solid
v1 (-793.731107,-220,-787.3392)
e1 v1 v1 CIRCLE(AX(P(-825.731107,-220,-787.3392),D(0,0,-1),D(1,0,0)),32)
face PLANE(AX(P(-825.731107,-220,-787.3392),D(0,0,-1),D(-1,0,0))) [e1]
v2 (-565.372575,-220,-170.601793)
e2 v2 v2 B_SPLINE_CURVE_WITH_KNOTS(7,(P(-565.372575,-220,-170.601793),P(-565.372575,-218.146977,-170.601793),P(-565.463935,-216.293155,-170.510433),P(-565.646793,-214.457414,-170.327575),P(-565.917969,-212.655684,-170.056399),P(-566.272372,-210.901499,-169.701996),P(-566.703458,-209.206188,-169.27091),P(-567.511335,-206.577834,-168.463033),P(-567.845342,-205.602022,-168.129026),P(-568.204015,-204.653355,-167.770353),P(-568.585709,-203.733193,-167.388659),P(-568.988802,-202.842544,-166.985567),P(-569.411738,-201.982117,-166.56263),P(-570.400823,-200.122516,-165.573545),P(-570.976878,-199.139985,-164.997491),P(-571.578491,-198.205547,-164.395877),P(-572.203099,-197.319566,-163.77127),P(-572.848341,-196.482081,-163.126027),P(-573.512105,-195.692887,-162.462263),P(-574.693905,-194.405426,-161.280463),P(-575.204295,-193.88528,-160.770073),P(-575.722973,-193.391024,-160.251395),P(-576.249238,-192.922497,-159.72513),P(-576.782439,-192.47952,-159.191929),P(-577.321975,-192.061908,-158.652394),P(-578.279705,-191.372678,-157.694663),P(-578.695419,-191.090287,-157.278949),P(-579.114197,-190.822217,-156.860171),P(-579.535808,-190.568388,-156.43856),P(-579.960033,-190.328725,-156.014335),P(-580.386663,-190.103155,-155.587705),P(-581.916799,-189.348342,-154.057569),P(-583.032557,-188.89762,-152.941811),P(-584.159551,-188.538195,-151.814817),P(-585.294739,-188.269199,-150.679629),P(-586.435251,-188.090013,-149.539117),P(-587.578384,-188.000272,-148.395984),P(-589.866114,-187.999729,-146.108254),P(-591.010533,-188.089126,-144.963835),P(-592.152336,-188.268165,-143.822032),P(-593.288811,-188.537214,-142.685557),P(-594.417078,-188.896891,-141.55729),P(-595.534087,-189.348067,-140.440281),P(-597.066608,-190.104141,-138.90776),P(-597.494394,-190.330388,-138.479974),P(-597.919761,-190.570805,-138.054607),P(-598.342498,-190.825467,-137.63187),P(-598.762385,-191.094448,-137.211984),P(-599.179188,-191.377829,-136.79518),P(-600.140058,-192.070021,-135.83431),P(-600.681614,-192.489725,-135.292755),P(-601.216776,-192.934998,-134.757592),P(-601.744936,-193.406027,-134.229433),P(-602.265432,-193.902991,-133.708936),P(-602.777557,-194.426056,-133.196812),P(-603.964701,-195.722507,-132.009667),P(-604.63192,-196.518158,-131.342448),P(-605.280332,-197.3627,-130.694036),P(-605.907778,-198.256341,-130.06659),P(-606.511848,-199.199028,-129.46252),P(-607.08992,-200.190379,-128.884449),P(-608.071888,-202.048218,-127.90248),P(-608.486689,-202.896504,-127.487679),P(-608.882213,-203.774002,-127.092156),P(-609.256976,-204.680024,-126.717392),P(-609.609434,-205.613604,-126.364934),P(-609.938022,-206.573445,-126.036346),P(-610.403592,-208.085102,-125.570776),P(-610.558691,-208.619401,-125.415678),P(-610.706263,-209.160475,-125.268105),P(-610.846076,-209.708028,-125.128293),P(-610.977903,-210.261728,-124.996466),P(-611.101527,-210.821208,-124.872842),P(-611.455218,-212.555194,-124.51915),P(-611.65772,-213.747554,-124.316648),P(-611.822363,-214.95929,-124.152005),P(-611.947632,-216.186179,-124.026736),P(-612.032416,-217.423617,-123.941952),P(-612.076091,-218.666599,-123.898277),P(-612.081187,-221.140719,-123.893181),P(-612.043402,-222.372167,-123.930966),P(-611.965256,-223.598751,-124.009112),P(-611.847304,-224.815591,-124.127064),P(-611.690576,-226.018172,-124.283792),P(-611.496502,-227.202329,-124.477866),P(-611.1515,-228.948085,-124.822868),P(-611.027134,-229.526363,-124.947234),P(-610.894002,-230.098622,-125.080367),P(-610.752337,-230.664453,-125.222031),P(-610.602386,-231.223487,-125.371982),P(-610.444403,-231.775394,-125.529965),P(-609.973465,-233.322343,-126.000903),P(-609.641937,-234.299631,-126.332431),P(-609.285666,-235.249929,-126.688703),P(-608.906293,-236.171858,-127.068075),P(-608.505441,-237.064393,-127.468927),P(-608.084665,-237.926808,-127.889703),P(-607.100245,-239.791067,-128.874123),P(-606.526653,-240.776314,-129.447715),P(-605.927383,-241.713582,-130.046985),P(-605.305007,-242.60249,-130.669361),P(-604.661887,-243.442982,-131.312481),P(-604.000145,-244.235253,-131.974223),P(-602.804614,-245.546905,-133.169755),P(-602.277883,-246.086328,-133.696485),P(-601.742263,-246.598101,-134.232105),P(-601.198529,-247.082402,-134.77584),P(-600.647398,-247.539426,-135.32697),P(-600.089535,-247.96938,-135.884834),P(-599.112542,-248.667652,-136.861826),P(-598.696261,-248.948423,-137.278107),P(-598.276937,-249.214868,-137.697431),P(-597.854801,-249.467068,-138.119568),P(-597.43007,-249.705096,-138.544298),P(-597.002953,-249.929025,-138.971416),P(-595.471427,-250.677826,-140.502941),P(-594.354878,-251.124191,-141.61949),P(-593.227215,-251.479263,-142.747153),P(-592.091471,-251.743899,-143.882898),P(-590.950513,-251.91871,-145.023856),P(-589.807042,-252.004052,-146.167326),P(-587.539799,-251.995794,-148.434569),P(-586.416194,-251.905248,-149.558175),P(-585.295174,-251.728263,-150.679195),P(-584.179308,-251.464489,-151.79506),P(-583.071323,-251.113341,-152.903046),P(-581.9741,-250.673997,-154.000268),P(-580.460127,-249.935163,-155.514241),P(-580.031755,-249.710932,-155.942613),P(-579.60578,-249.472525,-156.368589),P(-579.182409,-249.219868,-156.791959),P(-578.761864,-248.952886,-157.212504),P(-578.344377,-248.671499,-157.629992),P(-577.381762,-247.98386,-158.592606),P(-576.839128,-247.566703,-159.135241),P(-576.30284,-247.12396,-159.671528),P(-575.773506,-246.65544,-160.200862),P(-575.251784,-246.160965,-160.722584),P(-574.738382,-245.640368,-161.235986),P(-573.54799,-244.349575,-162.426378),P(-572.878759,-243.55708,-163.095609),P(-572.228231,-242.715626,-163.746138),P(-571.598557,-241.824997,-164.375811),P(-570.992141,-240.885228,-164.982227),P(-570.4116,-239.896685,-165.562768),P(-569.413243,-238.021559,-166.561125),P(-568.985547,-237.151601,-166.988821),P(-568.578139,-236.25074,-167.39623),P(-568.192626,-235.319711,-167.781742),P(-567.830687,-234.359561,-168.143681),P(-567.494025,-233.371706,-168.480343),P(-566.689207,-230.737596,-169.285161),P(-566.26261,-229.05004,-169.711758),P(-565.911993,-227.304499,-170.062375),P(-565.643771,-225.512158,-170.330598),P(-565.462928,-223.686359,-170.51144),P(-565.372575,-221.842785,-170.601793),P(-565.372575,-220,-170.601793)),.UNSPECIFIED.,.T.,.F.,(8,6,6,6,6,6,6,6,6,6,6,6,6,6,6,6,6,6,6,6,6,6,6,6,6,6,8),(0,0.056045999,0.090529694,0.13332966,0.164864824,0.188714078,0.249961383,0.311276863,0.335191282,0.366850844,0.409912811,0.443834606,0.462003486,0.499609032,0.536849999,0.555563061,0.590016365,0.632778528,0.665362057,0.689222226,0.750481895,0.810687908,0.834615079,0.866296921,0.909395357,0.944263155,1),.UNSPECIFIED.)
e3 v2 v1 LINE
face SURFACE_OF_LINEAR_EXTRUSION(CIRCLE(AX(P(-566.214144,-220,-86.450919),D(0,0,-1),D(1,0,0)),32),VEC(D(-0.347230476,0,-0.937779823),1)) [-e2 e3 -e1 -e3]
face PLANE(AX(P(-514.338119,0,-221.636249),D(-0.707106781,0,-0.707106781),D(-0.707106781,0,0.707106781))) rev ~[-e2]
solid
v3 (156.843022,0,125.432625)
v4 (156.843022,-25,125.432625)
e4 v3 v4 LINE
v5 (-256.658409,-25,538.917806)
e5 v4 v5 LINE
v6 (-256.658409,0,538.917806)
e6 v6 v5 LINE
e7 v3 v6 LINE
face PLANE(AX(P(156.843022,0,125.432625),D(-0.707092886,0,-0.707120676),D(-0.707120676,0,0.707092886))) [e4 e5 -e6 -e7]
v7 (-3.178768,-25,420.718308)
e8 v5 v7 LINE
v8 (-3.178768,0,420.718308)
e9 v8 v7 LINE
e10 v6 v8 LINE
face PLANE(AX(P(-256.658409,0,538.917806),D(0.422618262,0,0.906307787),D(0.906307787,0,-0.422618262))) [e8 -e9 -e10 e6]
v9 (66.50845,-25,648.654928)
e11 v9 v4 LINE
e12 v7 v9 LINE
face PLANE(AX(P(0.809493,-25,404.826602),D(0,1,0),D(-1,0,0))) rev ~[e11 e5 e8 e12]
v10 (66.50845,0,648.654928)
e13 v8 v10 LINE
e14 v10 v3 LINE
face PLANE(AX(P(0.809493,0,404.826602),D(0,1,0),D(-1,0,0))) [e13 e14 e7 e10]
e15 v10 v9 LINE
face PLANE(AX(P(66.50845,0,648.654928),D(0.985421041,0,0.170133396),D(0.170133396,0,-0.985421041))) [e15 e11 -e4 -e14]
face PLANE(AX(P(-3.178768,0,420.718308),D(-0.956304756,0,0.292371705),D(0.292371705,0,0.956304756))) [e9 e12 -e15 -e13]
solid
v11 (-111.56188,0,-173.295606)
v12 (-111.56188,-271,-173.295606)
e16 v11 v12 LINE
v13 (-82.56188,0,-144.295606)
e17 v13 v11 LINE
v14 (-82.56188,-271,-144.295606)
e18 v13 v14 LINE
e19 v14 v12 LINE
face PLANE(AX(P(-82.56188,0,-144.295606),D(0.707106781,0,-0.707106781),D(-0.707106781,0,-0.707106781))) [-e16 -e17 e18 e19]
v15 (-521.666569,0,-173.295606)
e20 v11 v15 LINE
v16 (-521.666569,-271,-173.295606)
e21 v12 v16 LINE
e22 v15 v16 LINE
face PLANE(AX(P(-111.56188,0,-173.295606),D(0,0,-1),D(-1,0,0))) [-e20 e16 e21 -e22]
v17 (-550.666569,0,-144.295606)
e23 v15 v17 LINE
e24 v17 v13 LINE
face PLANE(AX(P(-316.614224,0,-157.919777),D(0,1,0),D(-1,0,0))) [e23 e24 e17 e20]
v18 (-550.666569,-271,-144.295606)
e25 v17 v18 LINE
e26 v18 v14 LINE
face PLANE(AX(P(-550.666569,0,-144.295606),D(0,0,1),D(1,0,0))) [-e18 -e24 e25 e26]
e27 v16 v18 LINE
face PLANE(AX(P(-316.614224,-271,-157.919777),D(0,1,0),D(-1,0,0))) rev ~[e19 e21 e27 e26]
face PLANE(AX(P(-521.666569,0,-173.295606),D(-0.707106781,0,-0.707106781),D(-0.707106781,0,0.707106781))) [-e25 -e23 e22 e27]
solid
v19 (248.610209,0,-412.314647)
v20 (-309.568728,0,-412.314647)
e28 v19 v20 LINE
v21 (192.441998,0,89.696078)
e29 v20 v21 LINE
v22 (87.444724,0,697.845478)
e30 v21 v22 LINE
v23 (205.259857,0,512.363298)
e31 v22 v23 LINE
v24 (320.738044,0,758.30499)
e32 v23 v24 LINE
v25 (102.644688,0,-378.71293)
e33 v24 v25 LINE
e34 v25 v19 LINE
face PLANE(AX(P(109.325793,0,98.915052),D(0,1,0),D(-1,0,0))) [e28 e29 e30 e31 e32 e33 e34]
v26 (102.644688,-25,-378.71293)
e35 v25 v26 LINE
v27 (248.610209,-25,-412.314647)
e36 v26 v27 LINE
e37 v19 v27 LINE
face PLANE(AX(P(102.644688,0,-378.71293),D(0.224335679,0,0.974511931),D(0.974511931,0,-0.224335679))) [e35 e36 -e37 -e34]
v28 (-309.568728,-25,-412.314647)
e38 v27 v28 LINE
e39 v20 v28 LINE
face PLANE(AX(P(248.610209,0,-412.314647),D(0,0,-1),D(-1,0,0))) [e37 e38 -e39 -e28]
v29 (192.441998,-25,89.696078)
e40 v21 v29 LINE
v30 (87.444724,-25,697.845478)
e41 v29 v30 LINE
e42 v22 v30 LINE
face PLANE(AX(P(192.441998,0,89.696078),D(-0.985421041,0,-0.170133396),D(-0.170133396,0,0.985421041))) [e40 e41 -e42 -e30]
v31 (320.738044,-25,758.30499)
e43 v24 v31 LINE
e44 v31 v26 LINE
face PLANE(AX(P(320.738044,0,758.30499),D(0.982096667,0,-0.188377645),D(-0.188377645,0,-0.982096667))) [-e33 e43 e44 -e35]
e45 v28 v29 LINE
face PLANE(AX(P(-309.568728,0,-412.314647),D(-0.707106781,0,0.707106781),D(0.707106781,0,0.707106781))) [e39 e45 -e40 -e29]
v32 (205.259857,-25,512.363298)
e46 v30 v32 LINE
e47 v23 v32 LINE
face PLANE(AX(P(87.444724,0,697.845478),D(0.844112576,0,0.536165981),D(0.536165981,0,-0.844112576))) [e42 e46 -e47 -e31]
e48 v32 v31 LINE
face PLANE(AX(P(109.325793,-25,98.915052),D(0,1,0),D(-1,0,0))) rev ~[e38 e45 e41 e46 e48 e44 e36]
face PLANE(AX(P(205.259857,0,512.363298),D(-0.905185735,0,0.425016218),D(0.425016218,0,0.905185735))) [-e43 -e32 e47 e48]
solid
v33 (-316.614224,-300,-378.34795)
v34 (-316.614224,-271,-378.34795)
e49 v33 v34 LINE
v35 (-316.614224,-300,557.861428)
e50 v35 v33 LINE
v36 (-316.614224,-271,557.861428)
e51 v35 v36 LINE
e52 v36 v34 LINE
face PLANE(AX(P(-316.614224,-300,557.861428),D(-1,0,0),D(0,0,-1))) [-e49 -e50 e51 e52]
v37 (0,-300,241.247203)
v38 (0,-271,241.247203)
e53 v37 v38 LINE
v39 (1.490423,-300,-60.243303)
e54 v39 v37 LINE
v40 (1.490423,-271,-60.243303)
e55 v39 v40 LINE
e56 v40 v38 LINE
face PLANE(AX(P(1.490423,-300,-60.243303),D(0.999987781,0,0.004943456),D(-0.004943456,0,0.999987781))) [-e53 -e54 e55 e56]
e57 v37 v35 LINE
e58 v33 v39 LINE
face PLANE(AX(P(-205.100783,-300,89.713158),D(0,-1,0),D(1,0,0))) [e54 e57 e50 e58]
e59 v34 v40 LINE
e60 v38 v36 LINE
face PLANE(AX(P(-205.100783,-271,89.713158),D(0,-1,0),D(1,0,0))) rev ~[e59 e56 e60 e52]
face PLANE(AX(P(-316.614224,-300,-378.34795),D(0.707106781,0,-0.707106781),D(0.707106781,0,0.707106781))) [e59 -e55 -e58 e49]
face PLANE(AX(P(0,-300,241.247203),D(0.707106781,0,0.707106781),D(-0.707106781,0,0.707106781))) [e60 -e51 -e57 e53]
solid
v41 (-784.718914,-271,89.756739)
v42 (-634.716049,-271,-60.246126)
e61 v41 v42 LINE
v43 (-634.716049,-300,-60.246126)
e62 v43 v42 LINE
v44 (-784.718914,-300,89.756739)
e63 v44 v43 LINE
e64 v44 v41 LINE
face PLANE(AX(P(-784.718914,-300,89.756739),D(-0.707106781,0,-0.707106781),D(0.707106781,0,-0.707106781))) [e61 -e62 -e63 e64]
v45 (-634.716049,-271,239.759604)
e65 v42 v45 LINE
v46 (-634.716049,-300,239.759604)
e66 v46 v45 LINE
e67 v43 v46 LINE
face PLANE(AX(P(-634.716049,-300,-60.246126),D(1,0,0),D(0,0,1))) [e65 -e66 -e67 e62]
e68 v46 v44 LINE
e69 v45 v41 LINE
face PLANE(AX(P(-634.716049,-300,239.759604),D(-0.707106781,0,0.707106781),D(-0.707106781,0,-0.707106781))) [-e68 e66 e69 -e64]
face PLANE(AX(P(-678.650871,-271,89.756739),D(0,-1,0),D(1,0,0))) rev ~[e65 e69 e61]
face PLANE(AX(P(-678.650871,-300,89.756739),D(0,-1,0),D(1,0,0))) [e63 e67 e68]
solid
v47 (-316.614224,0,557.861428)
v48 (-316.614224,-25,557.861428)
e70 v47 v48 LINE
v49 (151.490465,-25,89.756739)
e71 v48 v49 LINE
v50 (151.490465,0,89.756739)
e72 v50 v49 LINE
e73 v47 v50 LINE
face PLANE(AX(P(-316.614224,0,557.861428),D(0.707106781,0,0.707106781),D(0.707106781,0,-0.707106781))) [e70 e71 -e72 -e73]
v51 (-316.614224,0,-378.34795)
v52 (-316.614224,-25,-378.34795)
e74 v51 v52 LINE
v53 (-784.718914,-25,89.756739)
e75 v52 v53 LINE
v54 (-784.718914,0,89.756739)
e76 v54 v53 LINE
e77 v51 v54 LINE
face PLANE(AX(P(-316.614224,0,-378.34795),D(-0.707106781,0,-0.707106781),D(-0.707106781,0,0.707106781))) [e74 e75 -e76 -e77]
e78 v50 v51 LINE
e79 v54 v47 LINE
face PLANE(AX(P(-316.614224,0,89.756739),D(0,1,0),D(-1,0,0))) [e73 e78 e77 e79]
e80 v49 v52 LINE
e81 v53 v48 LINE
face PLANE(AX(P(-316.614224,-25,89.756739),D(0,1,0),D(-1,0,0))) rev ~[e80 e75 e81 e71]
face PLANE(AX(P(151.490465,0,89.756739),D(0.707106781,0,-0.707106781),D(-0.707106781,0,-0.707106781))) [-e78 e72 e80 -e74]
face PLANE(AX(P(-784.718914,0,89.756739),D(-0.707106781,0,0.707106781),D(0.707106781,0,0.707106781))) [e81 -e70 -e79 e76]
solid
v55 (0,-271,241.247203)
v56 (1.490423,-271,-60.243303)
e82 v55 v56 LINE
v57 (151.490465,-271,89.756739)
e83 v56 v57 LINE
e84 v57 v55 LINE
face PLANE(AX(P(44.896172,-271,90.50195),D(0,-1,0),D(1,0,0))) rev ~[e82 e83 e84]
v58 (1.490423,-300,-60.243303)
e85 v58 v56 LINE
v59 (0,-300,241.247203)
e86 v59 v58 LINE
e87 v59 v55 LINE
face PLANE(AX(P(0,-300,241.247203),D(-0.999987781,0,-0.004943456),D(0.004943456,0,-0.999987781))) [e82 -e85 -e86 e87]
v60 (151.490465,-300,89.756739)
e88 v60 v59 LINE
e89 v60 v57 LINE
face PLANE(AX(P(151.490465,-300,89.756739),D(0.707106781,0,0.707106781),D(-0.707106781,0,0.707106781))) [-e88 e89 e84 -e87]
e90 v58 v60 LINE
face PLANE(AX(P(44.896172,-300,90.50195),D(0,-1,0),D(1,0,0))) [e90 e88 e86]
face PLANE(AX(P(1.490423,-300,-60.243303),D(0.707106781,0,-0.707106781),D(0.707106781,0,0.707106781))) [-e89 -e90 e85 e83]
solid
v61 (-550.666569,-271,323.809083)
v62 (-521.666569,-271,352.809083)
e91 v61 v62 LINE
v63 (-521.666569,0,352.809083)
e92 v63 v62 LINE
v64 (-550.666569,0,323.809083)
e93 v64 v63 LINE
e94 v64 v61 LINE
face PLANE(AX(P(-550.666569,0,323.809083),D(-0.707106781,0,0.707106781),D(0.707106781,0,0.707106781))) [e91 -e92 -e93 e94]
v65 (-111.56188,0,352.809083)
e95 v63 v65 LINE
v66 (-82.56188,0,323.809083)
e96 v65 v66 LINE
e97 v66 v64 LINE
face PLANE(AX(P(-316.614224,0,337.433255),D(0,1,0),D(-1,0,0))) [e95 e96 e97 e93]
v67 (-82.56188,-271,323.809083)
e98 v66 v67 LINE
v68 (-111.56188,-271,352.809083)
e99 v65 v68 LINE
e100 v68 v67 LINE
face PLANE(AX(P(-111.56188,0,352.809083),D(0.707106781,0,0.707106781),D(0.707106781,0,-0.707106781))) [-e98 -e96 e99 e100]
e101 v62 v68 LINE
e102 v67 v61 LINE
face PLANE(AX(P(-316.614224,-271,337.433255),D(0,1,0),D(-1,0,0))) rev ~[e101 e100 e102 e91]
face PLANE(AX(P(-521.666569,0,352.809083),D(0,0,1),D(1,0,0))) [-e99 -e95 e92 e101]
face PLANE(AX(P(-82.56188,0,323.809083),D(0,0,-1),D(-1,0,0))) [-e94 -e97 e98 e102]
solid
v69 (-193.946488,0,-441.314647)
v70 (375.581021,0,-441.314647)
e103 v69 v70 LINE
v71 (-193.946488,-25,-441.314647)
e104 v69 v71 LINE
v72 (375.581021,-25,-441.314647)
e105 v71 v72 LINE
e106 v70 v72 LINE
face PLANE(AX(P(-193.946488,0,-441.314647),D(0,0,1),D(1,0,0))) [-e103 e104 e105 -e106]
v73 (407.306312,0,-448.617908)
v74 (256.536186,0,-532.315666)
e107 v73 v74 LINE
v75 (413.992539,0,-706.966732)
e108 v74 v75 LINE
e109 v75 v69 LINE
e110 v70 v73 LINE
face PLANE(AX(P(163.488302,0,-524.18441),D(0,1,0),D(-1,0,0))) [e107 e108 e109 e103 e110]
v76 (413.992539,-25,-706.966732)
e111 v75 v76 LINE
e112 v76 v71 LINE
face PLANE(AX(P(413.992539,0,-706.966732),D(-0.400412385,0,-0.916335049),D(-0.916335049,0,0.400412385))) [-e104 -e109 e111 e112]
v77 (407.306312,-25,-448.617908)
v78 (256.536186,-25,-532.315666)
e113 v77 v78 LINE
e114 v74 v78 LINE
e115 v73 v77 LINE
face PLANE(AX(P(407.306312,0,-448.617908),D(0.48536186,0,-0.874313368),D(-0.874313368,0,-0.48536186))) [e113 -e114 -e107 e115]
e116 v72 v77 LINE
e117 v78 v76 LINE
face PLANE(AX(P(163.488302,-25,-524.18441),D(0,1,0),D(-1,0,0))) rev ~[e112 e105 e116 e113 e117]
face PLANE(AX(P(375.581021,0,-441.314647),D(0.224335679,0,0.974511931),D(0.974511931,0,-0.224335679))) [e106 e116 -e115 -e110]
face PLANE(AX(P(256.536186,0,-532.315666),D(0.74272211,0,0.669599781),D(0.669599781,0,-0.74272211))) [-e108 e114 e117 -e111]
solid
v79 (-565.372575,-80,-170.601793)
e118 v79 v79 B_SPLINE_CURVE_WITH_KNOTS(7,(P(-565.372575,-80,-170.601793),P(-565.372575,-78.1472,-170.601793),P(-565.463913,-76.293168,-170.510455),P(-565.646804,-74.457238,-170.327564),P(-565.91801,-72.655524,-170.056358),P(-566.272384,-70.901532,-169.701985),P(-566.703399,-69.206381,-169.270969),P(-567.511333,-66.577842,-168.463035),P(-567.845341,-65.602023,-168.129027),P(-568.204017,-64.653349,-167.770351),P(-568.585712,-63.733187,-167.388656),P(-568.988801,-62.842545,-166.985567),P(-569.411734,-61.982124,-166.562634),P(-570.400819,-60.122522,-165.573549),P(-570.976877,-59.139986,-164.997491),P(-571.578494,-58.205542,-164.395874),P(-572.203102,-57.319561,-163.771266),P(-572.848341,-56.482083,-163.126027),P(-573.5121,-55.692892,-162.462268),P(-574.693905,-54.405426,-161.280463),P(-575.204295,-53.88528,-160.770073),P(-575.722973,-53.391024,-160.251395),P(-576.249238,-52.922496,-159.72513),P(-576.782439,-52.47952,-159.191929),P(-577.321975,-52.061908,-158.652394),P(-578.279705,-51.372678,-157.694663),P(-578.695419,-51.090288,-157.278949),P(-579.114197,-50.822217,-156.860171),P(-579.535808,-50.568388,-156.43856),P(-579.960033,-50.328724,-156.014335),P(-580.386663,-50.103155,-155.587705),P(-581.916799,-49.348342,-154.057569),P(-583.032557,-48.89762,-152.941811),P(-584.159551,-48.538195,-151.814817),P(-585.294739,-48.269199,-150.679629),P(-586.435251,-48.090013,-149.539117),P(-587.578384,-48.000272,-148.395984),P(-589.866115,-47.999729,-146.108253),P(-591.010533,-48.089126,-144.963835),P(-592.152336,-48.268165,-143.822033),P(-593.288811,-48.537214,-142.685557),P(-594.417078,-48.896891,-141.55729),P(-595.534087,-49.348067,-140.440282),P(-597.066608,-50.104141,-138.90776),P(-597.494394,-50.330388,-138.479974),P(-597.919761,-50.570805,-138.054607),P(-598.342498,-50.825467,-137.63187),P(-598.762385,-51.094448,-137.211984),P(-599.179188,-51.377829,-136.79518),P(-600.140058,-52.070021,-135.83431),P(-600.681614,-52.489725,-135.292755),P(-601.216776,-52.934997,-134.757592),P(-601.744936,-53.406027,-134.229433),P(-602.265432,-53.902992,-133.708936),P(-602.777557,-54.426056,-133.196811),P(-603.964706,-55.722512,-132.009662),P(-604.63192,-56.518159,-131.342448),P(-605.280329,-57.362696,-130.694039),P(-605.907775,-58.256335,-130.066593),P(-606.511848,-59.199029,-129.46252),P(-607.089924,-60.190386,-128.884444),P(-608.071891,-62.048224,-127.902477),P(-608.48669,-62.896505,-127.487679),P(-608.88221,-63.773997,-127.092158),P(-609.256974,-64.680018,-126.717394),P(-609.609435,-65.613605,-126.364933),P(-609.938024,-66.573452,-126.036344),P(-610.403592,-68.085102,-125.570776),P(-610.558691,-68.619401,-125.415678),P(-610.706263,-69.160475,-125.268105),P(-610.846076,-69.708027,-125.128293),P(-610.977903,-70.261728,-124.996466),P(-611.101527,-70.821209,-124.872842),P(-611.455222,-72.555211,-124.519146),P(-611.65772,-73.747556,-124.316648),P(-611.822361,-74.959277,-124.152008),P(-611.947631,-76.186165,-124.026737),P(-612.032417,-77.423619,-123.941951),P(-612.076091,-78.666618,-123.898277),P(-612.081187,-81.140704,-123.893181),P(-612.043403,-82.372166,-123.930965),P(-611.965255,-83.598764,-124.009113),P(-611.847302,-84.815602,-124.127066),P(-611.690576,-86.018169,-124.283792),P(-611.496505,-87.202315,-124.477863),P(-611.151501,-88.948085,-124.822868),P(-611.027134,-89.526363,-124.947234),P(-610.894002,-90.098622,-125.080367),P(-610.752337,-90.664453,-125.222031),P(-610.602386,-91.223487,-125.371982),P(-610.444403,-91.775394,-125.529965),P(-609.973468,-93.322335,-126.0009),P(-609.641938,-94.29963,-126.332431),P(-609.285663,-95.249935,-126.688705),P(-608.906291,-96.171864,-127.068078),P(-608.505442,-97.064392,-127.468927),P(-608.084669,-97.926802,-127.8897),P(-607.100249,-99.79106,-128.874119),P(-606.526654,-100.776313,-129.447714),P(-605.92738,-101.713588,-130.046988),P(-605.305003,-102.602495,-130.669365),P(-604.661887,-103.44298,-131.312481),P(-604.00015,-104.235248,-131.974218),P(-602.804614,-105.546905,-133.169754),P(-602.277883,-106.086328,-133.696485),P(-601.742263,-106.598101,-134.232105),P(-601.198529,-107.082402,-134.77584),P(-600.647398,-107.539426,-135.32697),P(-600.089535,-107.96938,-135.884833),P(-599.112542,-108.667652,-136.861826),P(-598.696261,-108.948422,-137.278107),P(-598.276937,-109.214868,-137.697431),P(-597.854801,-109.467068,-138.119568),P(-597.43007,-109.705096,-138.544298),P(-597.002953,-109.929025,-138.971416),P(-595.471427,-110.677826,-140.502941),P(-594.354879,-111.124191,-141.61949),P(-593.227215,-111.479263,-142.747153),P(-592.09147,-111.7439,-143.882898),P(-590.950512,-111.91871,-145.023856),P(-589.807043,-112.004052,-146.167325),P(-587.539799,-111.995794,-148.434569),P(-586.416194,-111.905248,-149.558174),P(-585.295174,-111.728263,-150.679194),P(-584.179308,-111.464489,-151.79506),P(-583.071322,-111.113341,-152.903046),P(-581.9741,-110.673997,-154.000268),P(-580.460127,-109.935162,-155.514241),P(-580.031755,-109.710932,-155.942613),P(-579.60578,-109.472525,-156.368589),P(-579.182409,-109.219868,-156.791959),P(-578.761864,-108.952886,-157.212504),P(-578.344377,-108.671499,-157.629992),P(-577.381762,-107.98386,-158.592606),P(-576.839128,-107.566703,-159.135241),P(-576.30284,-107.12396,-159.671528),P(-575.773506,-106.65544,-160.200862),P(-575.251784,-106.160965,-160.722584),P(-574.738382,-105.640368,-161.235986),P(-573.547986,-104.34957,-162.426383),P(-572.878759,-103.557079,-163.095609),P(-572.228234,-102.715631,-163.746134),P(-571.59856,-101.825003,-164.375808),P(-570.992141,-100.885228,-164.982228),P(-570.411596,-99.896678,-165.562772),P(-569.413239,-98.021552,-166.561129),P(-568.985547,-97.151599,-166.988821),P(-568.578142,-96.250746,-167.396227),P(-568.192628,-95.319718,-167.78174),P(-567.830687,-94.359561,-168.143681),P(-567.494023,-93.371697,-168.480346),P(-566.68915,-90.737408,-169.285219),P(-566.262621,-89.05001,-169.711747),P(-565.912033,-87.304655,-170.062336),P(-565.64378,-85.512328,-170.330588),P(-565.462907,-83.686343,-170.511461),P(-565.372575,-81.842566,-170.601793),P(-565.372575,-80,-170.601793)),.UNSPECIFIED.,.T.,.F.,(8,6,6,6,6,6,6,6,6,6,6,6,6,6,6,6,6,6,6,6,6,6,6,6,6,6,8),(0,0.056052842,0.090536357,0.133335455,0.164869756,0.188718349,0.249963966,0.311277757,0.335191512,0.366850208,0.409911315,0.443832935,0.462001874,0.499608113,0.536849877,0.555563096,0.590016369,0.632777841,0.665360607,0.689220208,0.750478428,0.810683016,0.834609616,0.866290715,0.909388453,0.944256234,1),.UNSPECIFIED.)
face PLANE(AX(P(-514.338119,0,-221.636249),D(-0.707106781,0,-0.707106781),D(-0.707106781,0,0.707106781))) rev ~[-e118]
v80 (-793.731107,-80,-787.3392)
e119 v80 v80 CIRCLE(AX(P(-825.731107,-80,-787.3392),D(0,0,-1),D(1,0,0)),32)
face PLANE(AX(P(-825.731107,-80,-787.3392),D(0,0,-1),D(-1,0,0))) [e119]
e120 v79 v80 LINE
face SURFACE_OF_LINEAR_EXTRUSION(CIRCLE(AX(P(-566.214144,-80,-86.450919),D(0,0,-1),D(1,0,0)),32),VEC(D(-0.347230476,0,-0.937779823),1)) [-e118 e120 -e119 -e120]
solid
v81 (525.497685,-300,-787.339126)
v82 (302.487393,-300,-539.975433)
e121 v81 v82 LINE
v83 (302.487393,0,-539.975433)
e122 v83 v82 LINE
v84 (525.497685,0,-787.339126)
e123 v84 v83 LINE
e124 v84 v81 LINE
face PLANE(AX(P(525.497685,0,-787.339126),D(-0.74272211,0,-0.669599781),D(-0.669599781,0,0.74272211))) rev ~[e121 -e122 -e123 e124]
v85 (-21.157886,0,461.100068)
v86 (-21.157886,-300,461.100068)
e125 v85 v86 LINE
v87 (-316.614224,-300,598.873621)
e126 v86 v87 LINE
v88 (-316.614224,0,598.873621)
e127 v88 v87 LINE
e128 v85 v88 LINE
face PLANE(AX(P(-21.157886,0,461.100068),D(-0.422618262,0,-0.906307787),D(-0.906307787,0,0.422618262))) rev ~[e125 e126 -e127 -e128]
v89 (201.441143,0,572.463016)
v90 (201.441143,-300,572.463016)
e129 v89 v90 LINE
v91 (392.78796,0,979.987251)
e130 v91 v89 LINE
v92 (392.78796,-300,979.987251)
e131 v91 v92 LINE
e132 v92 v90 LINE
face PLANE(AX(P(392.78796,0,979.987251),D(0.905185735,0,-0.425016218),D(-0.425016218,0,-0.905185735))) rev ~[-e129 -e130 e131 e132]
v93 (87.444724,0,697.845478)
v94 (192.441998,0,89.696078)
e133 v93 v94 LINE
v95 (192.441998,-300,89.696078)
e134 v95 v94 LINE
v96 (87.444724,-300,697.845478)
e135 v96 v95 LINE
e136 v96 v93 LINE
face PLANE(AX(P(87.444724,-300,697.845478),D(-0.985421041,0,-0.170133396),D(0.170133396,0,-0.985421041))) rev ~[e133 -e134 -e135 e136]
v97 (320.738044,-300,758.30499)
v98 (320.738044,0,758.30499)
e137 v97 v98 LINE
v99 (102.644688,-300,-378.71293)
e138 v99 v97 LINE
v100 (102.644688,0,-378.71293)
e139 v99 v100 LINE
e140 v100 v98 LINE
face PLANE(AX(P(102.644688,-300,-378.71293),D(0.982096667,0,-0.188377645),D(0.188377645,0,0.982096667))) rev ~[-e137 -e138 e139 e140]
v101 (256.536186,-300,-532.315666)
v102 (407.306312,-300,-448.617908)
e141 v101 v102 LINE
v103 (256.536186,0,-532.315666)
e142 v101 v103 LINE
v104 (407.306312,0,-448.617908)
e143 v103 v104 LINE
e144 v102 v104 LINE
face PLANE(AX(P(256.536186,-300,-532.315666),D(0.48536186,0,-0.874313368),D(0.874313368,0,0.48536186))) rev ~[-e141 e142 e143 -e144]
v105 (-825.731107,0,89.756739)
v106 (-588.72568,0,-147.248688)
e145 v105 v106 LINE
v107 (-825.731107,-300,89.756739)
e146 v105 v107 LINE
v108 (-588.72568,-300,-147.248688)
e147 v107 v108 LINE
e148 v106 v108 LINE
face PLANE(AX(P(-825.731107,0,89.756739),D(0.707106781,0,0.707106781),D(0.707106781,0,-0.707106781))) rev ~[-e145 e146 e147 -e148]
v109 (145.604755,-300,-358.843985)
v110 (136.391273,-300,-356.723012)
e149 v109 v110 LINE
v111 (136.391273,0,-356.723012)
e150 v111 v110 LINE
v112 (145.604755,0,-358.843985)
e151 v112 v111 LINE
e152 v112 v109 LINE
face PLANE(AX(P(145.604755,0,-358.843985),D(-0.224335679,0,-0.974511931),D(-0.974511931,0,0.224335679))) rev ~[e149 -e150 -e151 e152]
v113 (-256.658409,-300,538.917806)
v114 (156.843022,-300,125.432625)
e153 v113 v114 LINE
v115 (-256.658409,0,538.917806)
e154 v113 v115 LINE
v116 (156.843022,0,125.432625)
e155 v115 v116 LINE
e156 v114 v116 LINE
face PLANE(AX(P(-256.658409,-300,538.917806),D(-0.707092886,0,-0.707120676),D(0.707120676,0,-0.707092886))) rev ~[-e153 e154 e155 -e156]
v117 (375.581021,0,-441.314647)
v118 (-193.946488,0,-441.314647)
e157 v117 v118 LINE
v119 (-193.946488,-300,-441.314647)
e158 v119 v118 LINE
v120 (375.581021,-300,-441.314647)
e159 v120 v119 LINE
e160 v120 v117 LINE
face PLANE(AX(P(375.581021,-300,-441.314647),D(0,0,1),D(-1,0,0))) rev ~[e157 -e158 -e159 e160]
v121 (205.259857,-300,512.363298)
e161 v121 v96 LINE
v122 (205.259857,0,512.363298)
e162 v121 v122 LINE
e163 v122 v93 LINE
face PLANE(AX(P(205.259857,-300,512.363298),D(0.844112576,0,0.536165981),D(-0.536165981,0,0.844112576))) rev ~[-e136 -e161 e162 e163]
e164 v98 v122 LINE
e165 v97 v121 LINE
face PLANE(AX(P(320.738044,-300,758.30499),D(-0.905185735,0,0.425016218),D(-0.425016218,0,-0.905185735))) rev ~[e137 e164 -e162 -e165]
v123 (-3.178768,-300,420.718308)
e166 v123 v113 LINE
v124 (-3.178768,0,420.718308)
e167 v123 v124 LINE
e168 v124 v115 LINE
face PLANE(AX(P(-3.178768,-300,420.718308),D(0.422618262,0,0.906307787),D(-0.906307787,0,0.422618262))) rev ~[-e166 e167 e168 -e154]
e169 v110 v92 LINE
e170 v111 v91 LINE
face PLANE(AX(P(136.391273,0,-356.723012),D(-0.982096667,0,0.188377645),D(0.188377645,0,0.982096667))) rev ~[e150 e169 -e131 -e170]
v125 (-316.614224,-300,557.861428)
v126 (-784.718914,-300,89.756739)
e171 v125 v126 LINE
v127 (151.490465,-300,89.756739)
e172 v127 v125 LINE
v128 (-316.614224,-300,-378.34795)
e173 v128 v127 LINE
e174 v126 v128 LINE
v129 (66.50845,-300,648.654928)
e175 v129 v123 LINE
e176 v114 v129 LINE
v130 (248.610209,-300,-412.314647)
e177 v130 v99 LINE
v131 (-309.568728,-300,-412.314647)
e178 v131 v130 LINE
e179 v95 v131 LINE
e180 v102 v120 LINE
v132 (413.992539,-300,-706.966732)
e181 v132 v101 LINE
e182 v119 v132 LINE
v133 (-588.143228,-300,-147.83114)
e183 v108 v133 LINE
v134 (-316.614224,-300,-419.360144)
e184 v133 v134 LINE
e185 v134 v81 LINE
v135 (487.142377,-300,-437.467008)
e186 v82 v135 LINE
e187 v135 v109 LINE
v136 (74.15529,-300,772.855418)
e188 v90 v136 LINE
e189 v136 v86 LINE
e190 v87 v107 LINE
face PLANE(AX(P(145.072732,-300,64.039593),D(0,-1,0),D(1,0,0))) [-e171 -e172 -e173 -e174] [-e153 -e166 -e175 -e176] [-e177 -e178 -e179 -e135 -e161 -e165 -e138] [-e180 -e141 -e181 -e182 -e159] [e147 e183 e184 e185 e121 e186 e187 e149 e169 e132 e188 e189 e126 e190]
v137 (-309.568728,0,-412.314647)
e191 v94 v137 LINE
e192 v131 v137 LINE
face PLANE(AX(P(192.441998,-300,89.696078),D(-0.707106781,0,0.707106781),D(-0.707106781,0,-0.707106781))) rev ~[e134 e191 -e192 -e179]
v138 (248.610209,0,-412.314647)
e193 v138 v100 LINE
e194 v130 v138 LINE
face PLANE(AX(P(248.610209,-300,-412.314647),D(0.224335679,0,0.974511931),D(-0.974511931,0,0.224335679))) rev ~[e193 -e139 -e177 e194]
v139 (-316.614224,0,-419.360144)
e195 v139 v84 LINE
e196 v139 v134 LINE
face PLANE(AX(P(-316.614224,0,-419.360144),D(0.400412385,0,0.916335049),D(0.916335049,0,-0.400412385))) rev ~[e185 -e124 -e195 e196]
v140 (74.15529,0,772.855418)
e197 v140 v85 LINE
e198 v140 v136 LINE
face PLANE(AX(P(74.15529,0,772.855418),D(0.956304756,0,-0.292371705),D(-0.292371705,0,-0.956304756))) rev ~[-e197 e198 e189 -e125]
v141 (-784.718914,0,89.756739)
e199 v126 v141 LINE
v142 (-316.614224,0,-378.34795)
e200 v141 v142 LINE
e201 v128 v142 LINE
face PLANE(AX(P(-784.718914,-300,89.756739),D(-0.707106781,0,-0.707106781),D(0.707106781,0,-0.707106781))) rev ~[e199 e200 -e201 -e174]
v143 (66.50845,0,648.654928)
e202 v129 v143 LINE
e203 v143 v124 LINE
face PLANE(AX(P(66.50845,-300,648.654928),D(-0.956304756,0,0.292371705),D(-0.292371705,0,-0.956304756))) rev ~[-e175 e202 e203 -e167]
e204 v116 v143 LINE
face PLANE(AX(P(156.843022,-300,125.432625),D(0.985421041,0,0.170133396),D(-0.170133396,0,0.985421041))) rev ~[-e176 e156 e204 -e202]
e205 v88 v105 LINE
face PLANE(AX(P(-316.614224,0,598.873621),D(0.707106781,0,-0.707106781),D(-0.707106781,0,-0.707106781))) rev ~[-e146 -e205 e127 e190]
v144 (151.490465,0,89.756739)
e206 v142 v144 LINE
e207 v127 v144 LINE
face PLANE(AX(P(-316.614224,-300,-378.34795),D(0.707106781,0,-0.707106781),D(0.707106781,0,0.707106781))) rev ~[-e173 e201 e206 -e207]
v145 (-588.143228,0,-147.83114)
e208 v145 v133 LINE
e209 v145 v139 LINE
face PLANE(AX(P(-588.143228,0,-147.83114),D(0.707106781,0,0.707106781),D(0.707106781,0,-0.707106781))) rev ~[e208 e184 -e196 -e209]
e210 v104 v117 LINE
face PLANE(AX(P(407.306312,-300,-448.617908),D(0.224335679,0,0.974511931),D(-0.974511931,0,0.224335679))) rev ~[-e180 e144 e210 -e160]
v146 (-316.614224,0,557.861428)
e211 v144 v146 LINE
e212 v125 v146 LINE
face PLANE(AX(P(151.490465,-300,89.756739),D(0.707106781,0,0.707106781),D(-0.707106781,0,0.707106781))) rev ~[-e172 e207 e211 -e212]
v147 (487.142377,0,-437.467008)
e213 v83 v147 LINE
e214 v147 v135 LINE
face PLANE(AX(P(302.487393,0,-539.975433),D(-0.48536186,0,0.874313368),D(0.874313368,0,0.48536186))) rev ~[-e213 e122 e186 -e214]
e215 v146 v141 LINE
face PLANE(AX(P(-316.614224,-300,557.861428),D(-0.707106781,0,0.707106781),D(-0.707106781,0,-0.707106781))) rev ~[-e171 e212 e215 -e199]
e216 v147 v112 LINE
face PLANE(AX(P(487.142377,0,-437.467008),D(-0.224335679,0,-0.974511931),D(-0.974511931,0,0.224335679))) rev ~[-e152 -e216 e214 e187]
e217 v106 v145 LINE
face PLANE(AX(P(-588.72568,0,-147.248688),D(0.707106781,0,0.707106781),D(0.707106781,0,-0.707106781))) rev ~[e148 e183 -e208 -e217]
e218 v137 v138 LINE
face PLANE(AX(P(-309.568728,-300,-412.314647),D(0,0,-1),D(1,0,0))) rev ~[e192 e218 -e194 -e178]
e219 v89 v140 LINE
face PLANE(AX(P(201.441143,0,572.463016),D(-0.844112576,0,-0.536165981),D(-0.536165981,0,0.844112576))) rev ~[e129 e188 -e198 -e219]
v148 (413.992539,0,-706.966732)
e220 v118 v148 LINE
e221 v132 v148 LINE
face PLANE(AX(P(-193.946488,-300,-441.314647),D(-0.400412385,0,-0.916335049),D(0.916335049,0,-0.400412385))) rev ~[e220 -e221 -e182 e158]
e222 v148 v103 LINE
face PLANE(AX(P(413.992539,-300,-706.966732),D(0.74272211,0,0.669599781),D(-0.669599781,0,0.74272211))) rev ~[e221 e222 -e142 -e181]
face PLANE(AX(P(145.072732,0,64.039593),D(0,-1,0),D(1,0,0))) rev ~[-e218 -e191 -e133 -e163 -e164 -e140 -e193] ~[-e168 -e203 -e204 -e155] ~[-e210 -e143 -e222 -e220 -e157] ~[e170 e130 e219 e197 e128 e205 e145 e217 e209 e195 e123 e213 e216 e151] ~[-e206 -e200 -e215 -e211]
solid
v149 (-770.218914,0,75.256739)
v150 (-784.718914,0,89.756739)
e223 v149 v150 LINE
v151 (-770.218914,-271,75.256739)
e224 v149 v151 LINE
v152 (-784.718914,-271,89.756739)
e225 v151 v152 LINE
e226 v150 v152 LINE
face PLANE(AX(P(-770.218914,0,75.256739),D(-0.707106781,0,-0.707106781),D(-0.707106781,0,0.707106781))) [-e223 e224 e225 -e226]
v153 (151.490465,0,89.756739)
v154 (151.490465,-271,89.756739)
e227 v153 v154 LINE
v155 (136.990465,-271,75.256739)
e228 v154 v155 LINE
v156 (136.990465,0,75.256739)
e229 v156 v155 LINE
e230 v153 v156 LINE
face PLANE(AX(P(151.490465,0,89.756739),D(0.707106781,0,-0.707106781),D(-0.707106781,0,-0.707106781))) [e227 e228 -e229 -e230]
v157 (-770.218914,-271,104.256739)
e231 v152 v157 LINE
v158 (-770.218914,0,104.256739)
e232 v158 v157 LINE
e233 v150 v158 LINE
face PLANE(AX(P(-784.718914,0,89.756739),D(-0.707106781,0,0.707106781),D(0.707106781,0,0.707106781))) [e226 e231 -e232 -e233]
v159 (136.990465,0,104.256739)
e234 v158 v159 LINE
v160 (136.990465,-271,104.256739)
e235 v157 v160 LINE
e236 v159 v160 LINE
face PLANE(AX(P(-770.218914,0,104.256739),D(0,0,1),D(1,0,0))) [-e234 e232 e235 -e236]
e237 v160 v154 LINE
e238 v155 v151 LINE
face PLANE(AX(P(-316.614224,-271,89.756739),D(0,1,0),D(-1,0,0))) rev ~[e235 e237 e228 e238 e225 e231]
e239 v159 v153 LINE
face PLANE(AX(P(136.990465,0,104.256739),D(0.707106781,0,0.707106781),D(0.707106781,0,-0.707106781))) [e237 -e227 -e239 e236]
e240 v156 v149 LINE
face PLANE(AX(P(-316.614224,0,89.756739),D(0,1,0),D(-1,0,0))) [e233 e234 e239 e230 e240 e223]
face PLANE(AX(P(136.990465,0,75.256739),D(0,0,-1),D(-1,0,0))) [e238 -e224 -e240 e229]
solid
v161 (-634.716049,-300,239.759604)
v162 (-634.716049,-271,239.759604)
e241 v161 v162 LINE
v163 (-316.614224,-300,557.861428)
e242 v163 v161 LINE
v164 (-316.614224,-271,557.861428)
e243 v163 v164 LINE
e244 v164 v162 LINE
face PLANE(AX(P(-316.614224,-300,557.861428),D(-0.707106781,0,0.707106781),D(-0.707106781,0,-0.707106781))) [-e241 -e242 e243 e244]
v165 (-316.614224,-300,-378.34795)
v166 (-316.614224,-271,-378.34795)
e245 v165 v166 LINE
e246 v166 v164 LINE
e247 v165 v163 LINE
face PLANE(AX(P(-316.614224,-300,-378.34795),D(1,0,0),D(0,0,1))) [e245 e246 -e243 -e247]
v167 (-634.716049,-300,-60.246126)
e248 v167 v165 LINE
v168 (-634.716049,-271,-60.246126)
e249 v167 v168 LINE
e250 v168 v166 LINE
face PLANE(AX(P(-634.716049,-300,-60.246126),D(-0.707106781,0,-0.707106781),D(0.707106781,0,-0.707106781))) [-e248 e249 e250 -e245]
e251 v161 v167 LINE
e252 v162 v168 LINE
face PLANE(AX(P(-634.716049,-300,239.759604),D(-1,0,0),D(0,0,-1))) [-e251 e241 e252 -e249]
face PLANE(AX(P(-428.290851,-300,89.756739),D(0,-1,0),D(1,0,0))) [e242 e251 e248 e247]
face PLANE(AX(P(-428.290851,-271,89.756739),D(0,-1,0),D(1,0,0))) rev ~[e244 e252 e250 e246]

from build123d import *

# Parameters (mm, degrees)
F1_DEPTH  = 300
F3_DEPTH  = 300.001
F5_DEPTH  = 29
F6_W      = 114.4185625017
F6_H      = 85.1782578975
F7_DEPTH  = 787.3392
F8_R      = 32
F11_DEPTH = 29
F13_DEPTH = 1133
F16_DEPTH = 25
F18_DEPTH = 271


# Not quite as in the source:
# - ends of sketch curves that miss each other by under 0.0002 mm in the source are joined


with BuildPart() as f1:
    # F0 (on Front) → F1 (new body)
    with BuildSketch(Plane.XZ):
        Polygon((-21.1578859129, 461.1000678804), (-316.6142244869, 598.8736212078), (-256.6584088585, 538.9178055795), (-3.1787667582, 420.7183072818), (66.3378061044, 648.0967762461), (156.9029738247, 125.3564228963), (192.5026579675, 89.7567387535), (102.4632774249, -379.6587024434), (248.7953454256, -413.3447998695), (-310.5988806554, -413.3447998695), (-316.6142244868, -419.3601437008), (525.4976853374, -787.3391258891), (302.487393405, -539.9754328116), (487.1423766473, -437.4670079686), (145.604754854, -358.8439845974), (136.3912729242, -356.7230123856), (392.7879601275, 979.987250609), (201.4411428648, 572.4630155265), (74.1552898267, 772.8554183243), align=None)
        Polygon((379.9683977473, -442.5537108722), (407.0146211055, -448.7798356546), (256.5361856193, -532.3156662273), (413.9925393712, -706.9667319925), (-191.1109175542, -442.5537108722), align=None, mode=Mode.SUBTRACT)
        Polygon((320.7380442272, 758.304990145), (192.5026579675, 89.7567387535), (87.0405885007, 698.4817279892), (205.2598565448, 512.363297583), align=None, mode=Mode.SUBTRACT)
        Polygon((-316.6142244869, 598.8736212078), (-825.7311069412, 89.7567387535), (-588.7256799965, -147.2486881911), (-588.1432284625, -147.8311397252), (-316.6142244868, -419.3601437008), (-310.5988806554, -413.3447998695), (-301.6208118268, -404.3667310409), (192.5026579675, 89.7567387535), (156.9029738247, 125.3564228963), (-256.6584088585, 538.9178055795), align=None)
        Polygon((-316.6142244867, -378.347950392), (-577.6435249243, -117.3186499544), (-784.7189136323, 89.7567387535), (-316.6142244868, 557.861427899), (151.4904646587, 89.7567387535), align=None, mode=Mode.SUBTRACT)
        Polygon((-784.7189136323, 89.7567387535), (-577.6435249243, -117.3186499544), (-316.6142244867, -378.347950392), (151.4904646587, 89.7567387535), (-316.6142244868, 557.861427899), align=None)
        Polygon((87.0405885007, 698.4817279892), (192.5026579675, 89.7567387535), (320.7380442272, 758.304990145), (205.2598565448, 512.363297583), align=None)
        Polygon((256.5361856193, -532.3156662273), (407.0146211055, -448.7798356546), (379.9683977473, -442.5537108722), (-191.1109175542, -442.5537108722), (413.9925393712, -706.9667319925), align=None)
        Polygon((102.4632774249, -379.6587024434), (192.5026579675, 89.7567387535), (-301.6208118268, -404.3667310409), (-310.5988806554, -413.3447998695), (248.7953454256, -413.3447998695), align=None)
        Polygon((-3.1787667582, 420.7183072818), (-256.6584088585, 538.9178055795), (156.9029738247, 125.3564228963), (66.3378074545, 648.0967806623), align=None)
    extrude(amount=F1_DEPTH)

    # F2 (on face) → F3 (cut, through all)
    with BuildSketch(Plane.XZ.offset(300)):
        Polygon((-316.6142244869, 557.861427899), (-784.7189136323, 89.7567387535), (-316.6142244868, -378.347950392), (151.4904646587, 89.7567387536), align=None)
        Polygon((66.5084501228, 648.6549276806), (-3.1787679861, 420.7183078543), (-256.6584088585, 538.9178055795), (156.843021512, 125.4326254129), align=None)
        Polygon((205.2598565448, 512.363297583), (87.4447238518, 697.845477753), (192.441997649, 89.6960784351), (-309.5687277895, -412.3146470034), (248.6102088079, -412.3146470034), (102.6446876949, -378.7129298117), (320.7380442272, 758.304990145), align=None)
        Polygon((375.5810214862, -441.3146470034), (-193.9464883107, -441.3146470034), (413.9925393712, -706.9667319925), (256.5361856193, -532.3156662273), (407.306312324, -448.6179076805), align=None)
    extrude(amount=-F3_DEPTH, mode=Mode.SUBTRACT)


with BuildPart() as f5:
    # F4 (on face) → F5 (new body)
    with BuildSketch(Plane.XZ.offset(300)):
        Polygon((-316.6142244869, -378.347950392), (-316.6142244869, 557.861427899), (-634.7160485409, 239.7596038449), (-634.7160485409, -60.2461263379), align=None)
    extrude(amount=-F5_DEPTH)


with BuildPart() as f5b:
    # F4 (on face) → F5, piece 2 (new body)
    with BuildSketch(Plane.XZ.offset(300)):
        Polygon((151.4904646587, 89.7567387536), (0, 241.2472034122), (1.4904232565, -60.2433026486), align=None)
    extrude(amount=-F5_DEPTH)


with BuildPart() as f7:
    # F6 (on Top) → F7 (new body)
    with BuildSketch(Plane.XY):
        with Locations((468.2884040865, 458.3749382247)):
            Rectangle(F6_W, F6_H)
    extrude(amount=-F7_DEPTH)


with BuildPart() as f9:
    # F9: sweep along a path in F0
    with BuildLine(Plane.XZ) as f9_path:
        Line((-566.2141442299, -86.4508450031), (-825.7311069412, -787.3391258892))
    # F8 (on face) → F9 (sweep)
    with BuildSketch(Plane(origin=(0, 0, -787.3392), x_dir=(1, 0, 0), z_dir=(0, 0, -1))):
        with Locations((-825.7311069411, 220)):
            Circle(F8_R)
        with Locations((-825.7311069411, 80)):
            Circle(F8_R)
    sweep(path=f9_path.line)


with BuildPart() as f11:
    # F4 (on face) → F11 (new body)
    with BuildSketch(Plane.XZ.offset(300)):
        Polygon((-634.7160485409, -60.2461263379), (-634.7160485409, 239.7596038449), (-784.7189136323, 89.7567387535), align=None)
    extrude(amount=-F11_DEPTH)


with BuildPart() as f11b:
    # F4 (on face) → F11, piece 2 (new body)
    with BuildSketch(Plane.XZ.offset(300)):
        Polygon((0, 241.2472034122), (-316.6142244869, 557.861427899), (-316.6142244869, -378.347950392), (1.4904232565, -60.2433026486), align=None)
    extrude(amount=-F11_DEPTH)


with BuildPart() as f13:
    # F12 (on face) → F13 (new body)
    with BuildSketch(Plane(origin=(0, 0, 0), x_dir=(-1, 0, 0), z_dir=(0, 1, 0))):
        Polygon((444.9293017387, 0), (514.3381191953, -221.6362489923), (704.6059726342, -31.3683955535), align=None)
    extrude(amount=-F13_DEPTH)


with BuildPart() as f9_1:
    add(f9.part)

    # F14: cut F13
    add(f13.part, mode=Mode.SUBTRACT)


with BuildPart() as f16:
    # F15 (on face) → F16 (new body)
    with BuildSketch(Plane(origin=(0, 0, 0), x_dir=(-1, 0, 0), z_dir=(0, 1, 0))):
        Polygon((784.7189136323, 89.7567387535), (316.6142244869, 557.861427899), (-151.4904646587, 89.7567387536), (316.6142244868, -378.347950392), align=None)
    extrude(amount=-F16_DEPTH)


with BuildPart() as f16b:
    # F15 (on face) → F16, piece 2 (new body)
    with BuildSketch(Plane(origin=(0, 0, 0), x_dir=(-1, 0, 0), z_dir=(0, 1, 0))):
        Polygon((-248.6102088079, -412.3146470034), (309.5687277895, -412.3146470034), (-192.441997649, 89.6960784351), (-87.4447238518, 697.845477753), (-205.2598565448, 512.363297583), (-320.7380442272, 758.304990145), (-102.6446876949, -378.7129298117), align=None)
    extrude(amount=-F16_DEPTH)


with BuildPart() as f16c:
    # F15 (on face) → F16, piece 3 (new body)
    with BuildSketch(Plane(origin=(0, 0, 0), x_dir=(-1, 0, 0), z_dir=(0, 1, 0))):
        Polygon((-375.5810214862, -441.3146470034), (-407.306312324, -448.6179076805), (-256.5361856193, -532.3156662273), (-413.9925393712, -706.9667319925), (193.9464883107, -441.3146470034), align=None)
    extrude(amount=-F16_DEPTH)


with BuildPart() as f16d:
    # F15 (on face) → F16, piece 4 (new body)
    with BuildSketch(Plane(origin=(0, 0, 0), x_dir=(-1, 0, 0), z_dir=(0, 1, 0))):
        Polygon((3.1787679861, 420.7183078543), (-66.5084501228, 648.6549276806), (-156.843021512, 125.4326254129), (256.6584088585, 538.9178055795), align=None)
    extrude(amount=-F16_DEPTH)


with BuildPart() as f18:
    # F17 (on face) → F18 (new body)
    with BuildSketch(Plane(origin=(0, 0, 0), x_dir=(-1, 0, 0), z_dir=(0, 1, 0))):
        Polygon((111.5618799141, 352.8090833263), (82.5618799141, 323.8090833263), (550.6665690596, 323.8090833263), (521.6665690596, 352.8090833263), align=None)
    extrude(amount=-F18_DEPTH)


with BuildPart() as f18b:
    # F17 (on face) → F18, piece 2 (new body)
    with BuildSketch(Plane(origin=(0, 0, 0), x_dir=(-1, 0, 0), z_dir=(0, 1, 0))):
        Polygon((-136.9904646587, 104.2567387535), (-151.4904646587, 89.7567387536), (-136.9904646586, 75.2567387535), (770.2189136323, 75.2567387535), (784.7189136323, 89.7567387535), (770.2189136323, 104.2567387535), align=None)
    extrude(amount=-F18_DEPTH)


with BuildPart() as f18c:
    # F17 (on face) → F18, piece 3 (new body)
    with BuildSketch(Plane(origin=(0, 0, 0), x_dir=(-1, 0, 0), z_dir=(0, 1, 0))):
        Polygon((550.6665690596, -144.2956058192), (82.5618799141, -144.2956058192), (111.5618799141, -173.2956058192), (521.6665690596, -173.2956058192), align=None)
    extrude(amount=-F18_DEPTH)


solid = Compound([f1.part, f5.part, f5b.part, f11.part, f11b.part, f9_1.part, f16.part, f16b.part, f16c.part, f16d.part, f18.part, f18b.part, f18c.part])
